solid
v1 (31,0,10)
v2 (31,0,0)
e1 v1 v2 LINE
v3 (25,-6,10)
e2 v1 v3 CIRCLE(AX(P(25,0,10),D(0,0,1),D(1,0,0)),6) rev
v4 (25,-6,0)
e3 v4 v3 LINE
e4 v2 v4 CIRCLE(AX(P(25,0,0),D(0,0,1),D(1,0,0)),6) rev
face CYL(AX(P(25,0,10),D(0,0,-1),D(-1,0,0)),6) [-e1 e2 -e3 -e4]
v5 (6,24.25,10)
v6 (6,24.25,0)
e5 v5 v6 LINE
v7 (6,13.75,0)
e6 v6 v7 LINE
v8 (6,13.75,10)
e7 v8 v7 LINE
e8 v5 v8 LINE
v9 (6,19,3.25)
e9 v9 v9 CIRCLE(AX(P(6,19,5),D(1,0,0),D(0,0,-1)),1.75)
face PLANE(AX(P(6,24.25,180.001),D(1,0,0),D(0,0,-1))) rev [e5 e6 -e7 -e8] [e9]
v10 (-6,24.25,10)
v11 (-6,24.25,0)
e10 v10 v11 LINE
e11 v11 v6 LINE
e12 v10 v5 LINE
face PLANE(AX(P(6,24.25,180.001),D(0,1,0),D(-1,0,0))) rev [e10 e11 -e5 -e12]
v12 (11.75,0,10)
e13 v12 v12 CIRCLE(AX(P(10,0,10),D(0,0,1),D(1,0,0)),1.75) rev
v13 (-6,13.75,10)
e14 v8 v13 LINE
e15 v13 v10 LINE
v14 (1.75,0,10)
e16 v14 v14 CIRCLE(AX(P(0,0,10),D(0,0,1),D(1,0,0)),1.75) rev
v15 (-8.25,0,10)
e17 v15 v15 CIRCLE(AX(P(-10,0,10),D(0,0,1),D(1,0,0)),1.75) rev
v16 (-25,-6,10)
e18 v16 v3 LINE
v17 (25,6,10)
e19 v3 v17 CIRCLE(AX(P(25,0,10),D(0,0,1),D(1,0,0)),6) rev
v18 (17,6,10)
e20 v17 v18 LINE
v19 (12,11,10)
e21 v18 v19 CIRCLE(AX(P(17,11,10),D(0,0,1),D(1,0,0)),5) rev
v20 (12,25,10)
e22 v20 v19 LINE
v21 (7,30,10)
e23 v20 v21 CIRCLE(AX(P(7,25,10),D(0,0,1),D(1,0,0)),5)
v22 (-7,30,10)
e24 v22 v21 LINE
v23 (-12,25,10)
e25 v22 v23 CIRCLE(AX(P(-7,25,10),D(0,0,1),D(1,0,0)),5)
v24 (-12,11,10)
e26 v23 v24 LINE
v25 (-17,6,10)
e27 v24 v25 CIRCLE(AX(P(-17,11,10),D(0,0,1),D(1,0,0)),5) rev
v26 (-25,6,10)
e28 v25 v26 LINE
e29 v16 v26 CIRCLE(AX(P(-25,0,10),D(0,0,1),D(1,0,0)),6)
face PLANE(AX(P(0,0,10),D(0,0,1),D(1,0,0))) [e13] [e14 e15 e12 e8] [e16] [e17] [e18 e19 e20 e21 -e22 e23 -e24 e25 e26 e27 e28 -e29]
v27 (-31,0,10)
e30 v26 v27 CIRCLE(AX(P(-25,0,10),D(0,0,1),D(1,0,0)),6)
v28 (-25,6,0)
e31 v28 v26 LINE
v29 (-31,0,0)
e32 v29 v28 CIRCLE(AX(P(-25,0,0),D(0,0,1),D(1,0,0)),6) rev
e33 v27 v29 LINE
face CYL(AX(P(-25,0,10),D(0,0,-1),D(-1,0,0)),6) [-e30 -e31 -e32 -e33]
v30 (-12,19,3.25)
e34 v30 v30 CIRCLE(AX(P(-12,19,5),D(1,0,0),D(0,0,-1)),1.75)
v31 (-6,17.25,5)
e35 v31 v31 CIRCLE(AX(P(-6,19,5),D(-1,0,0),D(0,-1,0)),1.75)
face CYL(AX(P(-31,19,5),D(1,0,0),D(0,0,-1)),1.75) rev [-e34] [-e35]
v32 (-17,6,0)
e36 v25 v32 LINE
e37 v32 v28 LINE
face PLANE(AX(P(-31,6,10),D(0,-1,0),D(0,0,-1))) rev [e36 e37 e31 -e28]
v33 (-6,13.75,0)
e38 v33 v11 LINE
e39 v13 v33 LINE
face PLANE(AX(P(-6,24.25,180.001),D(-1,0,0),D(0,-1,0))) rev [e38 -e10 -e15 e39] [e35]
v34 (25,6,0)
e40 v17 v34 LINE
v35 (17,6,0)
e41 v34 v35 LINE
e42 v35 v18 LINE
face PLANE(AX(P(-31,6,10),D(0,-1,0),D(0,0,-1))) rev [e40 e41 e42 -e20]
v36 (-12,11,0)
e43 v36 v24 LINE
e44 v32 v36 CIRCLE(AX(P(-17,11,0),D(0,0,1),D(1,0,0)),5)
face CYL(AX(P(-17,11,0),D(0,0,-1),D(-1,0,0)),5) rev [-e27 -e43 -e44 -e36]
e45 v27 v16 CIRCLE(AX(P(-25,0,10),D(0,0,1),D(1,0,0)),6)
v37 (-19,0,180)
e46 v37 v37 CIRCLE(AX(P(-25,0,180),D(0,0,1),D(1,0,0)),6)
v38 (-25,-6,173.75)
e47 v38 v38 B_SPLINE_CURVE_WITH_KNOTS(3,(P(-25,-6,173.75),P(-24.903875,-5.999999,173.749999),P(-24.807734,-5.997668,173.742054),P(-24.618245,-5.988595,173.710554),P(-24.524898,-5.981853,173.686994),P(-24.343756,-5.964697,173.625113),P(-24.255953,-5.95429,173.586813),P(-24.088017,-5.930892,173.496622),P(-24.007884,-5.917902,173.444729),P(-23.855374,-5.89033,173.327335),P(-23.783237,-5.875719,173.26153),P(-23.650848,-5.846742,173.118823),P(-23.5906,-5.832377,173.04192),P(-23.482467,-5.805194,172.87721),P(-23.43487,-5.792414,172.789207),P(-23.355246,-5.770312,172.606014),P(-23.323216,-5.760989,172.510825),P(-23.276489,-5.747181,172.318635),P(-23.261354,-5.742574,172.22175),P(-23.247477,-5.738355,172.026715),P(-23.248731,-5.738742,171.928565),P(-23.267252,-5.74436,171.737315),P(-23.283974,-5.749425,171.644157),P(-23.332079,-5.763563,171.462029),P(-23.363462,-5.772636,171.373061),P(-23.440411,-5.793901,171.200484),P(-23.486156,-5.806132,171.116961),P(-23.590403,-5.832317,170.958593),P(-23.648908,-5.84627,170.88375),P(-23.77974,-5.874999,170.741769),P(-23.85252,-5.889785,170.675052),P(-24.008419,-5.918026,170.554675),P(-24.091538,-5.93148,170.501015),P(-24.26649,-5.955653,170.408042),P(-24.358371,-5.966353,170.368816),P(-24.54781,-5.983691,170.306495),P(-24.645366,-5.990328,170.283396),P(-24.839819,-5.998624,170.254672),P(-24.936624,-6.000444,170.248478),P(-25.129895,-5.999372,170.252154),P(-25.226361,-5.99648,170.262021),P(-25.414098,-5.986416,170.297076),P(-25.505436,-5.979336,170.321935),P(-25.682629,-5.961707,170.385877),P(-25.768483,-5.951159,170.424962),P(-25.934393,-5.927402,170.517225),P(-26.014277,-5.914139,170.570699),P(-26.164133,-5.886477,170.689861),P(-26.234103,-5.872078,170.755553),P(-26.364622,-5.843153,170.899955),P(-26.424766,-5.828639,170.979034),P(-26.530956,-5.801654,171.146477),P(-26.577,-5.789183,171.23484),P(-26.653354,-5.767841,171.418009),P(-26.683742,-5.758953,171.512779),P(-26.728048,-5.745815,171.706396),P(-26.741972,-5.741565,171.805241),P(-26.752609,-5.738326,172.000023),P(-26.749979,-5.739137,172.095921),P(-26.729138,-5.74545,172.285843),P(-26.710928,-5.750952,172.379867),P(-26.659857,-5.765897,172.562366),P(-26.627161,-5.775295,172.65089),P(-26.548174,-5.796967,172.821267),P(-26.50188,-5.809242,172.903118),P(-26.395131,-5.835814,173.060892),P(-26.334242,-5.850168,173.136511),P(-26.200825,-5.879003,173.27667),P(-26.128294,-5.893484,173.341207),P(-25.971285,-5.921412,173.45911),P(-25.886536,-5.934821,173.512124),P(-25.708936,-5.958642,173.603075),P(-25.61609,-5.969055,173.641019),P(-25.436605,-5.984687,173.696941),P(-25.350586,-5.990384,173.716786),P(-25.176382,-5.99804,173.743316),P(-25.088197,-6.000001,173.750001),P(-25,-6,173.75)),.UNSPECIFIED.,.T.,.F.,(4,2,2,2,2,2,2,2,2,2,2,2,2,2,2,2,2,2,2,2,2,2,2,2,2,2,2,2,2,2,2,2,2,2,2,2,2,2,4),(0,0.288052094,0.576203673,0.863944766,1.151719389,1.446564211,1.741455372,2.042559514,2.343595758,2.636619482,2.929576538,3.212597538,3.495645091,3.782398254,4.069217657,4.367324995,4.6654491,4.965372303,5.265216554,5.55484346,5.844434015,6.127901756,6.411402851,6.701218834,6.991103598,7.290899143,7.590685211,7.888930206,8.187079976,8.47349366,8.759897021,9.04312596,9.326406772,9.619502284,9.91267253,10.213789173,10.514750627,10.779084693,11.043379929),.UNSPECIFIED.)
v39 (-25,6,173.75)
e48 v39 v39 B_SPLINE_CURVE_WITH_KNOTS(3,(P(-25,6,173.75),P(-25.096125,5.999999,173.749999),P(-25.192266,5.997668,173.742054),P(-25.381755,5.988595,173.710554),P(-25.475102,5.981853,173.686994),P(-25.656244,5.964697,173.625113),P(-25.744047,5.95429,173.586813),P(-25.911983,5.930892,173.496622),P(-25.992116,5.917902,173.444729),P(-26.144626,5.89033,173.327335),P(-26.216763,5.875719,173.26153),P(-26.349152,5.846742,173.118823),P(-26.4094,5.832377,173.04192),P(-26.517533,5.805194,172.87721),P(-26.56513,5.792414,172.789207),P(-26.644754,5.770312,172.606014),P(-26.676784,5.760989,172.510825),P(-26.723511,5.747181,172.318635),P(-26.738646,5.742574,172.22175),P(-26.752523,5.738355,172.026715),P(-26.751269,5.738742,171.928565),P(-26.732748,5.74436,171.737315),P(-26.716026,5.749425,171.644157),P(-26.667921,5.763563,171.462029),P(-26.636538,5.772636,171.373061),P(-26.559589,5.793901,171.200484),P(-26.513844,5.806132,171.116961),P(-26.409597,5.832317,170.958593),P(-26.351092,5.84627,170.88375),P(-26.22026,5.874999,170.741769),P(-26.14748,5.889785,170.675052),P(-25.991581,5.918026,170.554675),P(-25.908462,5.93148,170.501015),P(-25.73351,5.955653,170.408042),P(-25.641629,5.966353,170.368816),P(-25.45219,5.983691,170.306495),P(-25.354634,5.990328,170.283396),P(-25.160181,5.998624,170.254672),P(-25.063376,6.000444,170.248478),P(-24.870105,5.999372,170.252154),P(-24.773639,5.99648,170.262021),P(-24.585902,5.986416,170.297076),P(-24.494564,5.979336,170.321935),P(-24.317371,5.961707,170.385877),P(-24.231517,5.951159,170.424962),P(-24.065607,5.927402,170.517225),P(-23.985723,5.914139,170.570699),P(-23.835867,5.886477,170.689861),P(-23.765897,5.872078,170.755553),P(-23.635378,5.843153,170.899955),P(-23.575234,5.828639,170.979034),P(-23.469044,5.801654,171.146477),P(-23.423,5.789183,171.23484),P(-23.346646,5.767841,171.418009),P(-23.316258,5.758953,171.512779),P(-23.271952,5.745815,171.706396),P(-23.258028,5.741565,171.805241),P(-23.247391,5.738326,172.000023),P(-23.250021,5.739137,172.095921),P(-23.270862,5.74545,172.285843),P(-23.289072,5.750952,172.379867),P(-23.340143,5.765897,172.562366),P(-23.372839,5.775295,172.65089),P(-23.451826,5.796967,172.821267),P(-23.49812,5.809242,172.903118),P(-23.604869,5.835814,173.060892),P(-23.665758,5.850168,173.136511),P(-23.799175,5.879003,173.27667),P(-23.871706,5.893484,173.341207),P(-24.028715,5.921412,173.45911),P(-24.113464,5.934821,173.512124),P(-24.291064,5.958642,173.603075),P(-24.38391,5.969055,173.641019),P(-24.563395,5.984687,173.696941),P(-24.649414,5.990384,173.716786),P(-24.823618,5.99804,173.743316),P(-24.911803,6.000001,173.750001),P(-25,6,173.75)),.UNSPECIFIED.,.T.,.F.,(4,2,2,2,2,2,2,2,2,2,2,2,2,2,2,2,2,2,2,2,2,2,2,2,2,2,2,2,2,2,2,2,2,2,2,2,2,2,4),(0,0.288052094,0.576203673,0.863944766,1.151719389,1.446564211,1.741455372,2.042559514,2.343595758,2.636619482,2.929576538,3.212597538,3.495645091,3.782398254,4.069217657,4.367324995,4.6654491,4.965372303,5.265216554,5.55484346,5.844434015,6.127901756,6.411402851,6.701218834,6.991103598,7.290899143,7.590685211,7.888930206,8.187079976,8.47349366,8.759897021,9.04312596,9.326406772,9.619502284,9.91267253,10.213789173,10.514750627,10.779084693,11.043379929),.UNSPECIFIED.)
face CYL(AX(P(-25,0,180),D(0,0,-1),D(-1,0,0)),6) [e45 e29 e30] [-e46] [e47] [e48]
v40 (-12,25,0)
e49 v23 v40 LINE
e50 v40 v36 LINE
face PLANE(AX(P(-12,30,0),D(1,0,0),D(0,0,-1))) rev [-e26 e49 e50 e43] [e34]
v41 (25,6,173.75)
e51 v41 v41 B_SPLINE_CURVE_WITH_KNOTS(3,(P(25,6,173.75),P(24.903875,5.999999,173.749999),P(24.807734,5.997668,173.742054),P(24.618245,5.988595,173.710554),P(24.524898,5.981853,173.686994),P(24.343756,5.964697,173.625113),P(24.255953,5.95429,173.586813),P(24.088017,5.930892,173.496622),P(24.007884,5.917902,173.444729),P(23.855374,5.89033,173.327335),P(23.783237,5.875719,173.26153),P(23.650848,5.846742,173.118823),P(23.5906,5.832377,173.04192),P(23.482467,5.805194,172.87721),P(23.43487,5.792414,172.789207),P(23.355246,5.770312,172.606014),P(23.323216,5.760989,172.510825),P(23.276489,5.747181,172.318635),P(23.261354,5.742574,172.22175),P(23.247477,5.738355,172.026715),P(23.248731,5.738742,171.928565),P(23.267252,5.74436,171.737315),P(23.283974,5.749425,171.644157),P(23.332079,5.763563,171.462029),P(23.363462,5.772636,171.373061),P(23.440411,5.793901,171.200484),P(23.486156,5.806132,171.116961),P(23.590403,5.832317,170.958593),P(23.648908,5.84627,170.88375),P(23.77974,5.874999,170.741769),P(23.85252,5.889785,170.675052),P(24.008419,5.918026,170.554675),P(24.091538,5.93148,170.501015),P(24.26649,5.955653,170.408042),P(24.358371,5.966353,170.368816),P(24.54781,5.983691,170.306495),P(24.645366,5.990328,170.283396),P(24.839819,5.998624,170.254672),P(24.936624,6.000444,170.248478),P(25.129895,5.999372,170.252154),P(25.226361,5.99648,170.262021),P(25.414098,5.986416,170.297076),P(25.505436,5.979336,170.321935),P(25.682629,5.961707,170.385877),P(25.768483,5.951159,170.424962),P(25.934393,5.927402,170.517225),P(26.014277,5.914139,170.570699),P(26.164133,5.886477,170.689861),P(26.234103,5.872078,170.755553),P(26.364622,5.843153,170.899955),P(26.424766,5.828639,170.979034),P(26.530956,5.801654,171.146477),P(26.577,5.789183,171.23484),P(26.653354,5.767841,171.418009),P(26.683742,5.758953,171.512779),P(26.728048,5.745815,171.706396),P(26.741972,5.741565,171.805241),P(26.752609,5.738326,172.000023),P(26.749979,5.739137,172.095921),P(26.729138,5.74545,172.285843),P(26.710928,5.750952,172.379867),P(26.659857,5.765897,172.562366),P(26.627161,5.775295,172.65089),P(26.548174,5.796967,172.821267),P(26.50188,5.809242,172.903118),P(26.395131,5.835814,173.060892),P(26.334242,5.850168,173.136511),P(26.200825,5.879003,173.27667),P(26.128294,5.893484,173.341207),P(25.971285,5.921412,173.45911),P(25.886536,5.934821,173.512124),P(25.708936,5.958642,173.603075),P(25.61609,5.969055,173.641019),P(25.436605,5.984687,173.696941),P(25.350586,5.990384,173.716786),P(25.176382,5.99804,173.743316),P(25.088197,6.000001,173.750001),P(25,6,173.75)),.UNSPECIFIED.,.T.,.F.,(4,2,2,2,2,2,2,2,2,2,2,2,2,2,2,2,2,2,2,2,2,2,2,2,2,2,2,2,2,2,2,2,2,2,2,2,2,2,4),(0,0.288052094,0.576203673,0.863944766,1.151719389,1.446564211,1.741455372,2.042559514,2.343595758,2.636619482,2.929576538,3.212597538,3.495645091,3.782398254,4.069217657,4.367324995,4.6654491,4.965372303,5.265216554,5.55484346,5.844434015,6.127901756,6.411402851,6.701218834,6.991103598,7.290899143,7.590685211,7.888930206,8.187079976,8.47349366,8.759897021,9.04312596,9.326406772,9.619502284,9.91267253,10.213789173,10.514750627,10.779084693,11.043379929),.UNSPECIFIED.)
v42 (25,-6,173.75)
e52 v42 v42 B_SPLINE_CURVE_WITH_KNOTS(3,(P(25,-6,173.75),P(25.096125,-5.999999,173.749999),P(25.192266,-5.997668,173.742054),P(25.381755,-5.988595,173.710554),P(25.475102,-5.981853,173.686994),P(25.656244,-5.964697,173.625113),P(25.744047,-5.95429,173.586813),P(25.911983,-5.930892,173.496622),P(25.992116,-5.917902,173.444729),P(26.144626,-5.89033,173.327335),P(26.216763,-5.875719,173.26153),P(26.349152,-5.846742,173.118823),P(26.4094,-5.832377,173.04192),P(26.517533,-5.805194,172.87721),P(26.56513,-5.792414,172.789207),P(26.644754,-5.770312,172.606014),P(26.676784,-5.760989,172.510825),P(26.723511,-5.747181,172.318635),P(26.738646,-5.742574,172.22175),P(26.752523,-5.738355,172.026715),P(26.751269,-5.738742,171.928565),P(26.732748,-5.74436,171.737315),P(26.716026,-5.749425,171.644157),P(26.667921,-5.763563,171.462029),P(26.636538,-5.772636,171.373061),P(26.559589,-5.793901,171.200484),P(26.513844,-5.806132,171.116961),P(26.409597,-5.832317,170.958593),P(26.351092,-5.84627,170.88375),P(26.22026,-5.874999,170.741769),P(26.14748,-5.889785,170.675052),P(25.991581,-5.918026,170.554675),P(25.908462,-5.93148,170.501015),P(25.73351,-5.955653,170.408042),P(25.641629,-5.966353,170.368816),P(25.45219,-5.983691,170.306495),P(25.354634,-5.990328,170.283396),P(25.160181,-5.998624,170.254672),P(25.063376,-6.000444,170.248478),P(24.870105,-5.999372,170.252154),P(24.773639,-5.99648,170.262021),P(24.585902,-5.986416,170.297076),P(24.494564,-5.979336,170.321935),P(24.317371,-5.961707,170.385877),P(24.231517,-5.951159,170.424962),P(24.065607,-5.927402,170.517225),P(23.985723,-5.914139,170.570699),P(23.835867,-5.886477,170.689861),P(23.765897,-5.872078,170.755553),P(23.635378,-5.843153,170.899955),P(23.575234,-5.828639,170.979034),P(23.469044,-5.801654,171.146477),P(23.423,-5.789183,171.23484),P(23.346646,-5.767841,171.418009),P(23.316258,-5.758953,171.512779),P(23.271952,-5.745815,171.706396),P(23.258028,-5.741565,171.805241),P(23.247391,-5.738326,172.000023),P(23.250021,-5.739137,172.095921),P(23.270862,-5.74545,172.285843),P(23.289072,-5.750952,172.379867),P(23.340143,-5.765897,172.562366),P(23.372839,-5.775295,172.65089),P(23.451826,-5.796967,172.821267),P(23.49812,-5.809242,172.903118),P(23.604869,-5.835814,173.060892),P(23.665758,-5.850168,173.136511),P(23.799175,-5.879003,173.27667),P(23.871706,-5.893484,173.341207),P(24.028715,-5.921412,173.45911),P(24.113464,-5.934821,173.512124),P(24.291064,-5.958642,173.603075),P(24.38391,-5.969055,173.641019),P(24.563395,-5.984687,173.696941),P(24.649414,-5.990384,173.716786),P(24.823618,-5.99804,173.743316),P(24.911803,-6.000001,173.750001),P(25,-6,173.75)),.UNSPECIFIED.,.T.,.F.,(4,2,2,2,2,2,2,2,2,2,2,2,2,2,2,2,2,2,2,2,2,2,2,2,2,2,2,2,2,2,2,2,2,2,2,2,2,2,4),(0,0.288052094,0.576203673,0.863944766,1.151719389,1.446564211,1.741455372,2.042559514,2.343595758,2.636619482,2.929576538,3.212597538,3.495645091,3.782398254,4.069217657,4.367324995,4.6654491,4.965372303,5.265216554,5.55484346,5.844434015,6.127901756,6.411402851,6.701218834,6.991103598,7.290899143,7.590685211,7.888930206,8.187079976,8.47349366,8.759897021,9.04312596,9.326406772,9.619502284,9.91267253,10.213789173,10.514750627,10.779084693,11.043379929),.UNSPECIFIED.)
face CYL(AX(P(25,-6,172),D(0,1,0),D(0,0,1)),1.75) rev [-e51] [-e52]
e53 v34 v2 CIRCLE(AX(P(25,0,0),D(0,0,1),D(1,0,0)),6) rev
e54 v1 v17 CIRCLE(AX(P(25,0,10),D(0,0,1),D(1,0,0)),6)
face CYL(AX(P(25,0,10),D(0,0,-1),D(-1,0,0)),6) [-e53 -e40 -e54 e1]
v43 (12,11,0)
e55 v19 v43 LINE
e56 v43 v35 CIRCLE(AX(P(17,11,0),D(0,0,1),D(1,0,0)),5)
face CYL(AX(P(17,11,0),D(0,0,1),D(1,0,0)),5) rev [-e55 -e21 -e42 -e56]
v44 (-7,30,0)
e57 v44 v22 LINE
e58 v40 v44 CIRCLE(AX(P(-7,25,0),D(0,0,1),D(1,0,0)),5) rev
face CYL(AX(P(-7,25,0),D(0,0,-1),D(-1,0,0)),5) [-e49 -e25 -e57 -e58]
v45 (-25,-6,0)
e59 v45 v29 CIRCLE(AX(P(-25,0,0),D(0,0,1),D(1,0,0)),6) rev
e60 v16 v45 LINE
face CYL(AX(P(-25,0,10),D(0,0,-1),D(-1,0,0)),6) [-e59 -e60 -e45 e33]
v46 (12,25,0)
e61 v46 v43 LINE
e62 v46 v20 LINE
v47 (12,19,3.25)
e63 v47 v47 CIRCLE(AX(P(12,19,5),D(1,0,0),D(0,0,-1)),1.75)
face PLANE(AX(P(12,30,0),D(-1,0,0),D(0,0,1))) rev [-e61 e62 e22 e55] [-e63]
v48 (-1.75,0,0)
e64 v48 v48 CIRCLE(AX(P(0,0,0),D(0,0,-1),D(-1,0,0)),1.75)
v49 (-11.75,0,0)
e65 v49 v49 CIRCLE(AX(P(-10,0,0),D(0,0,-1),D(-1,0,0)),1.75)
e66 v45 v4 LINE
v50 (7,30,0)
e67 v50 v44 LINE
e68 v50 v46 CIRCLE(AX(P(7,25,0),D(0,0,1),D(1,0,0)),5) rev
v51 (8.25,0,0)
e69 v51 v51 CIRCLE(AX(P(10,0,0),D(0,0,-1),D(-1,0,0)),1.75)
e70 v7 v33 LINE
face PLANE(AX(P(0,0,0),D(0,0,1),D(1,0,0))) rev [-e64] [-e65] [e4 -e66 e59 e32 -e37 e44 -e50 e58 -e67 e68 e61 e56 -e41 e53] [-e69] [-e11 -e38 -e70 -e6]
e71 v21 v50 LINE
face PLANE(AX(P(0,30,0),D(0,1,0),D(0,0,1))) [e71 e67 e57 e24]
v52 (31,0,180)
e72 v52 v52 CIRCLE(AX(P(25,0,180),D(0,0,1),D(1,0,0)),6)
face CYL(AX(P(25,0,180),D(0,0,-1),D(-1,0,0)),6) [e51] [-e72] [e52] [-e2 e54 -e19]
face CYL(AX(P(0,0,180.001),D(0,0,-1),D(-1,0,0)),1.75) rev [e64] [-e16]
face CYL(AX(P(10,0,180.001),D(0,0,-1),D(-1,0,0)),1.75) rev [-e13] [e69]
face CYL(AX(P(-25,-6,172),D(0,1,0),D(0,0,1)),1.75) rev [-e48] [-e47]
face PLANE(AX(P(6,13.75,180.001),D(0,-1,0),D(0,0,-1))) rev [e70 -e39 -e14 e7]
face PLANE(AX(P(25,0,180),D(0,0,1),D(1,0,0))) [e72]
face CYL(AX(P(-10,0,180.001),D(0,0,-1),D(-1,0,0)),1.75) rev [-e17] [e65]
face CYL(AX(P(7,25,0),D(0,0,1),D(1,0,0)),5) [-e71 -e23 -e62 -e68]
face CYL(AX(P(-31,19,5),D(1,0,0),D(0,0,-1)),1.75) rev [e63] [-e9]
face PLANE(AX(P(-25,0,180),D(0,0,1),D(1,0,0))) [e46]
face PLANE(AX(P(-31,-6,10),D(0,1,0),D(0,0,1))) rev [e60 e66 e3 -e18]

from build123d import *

# Parameters (mm, degrees)
SKETCH1_W               = 62
SKETCH1_H               = 12
BOSS_EXTRUDE1_DEPTH     = 10
SKETCH2_R               = 6
BOSS_EXTRUDE2_DEPTH     = 170
SKETCH3_W               = 24
SKETCH3_H               = 10
BOSS_EXTRUDE3_DEPTH     = 24
CUT_EXTRUDE1_REACH      = 187.097
SKETCH4_W               = 12
SKETCH4_H               = 10.5
SKETCH5_R               = 1.75
CUT_EXTRUDE2_DEPTH      = 188.48066567
FILLET1_R               = 6
FILLET2_R               = 5
CUT_EXTRUDE3_DEPTH      = 186.097271725
CUT_EXTRUDE3_DEPTH_BACK = 186.097271725
SKETCH6_R               = 1.75
CUT_EXTRUDE4_REACH      = 187.097
SKETCH7_R               = 1.75
CUT_EXTRUDE5_REACH      = 187.097
SKETCH8_R               = 1.75


with BuildPart() as part:
    # Sketch1 → Boss-Extrude1 (new body)
    with BuildSketch(Plane.XY):
        Rectangle(SKETCH1_W, SKETCH1_H)
    extrude(amount=BOSS_EXTRUDE1_DEPTH)

    # Sketch2 → Boss-Extrude2 (add)
    with BuildSketch(Plane.XY.offset(10)):
        with Locations(Location((-25, 0, 0), (0, 0, 180))):
            Circle(SKETCH2_R)
        with Locations((25, 0)):
            Circle(SKETCH2_R)
    extrude(amount=BOSS_EXTRUDE2_DEPTH)

    # Sketch3 → Boss-Extrude3 (add)
    with BuildSketch(Plane(origin=(0, 6, 0), x_dir=(1, 0, 0), z_dir=(0, 1, 0))):
        with Locations((0, -5)):
            Rectangle(SKETCH3_W, SKETCH3_H)
    extrude(amount=BOSS_EXTRUDE3_DEPTH)

    # Sketch4 → Cut-Extrude1 (cut, up to next)
    with BuildSketch(Plane(origin=(0, 0, 0), x_dir=(-1, 0, 0), z_dir=(0, 0, -1)), mode=Mode.PRIVATE) as cut_extrude1_sk1:
        with Locations((0, 19)):
            Rectangle(SKETCH4_W, SKETCH4_H)
    cut_extrude1_tool1 = extrude(cut_extrude1_sk1.sketch, amount=-CUT_EXTRUDE1_REACH, mode=Mode.PRIVATE) & part.part
    add(cut_extrude1_tool1.solids().sort_by_distance((0, 19, 0))[0], mode=Mode.SUBTRACT)

    # Sketch5 → Cut-Extrude2 (cut, through all)
    with BuildSketch(Plane(origin=(12, 0, 0), x_dir=(0, 0, -1), z_dir=(1, 0, 0))):
        with Locations((-5, 19)):
            Circle(SKETCH5_R)
    extrude(amount=-CUT_EXTRUDE2_DEPTH, mode=Mode.SUBTRACT)

    # Fillet1
    fillet1_edges = [part.edges().sort_by_distance(p)[0] for p in [
        (-31, -6, 5),
        (-31, 6, 5),
        (31, 6, 5),
        (31, -6, 5),
    ]]
    fillet(fillet1_edges, radius=FILLET1_R - 0.0001)  # a hair under: the kernel refuses the full size

    # Fillet2
    fillet2_edges = [part.edges().sort_by_distance(p)[0] for p in [
        (-12, 6, 5),
        (12, 6, 5),
        (-12, 30, 5),
        (12, 30, 5),
    ]]
    fillet(fillet2_edges, radius=FILLET2_R)

    # Sketch6 → Cut-Extrude3 (cut, two sides: drawn at the far end of the back side and taken through both)
    with BuildSketch(Plane(origin=(0, 0, 0), x_dir=(1, 0, 0), z_dir=(0, 1, 0)).offset(-CUT_EXTRUDE3_DEPTH_BACK)):
        with Locations(Location((-25, -172, 0), (0, 0, 270))):
            Circle(SKETCH6_R)
        with Locations(Location((25, -172, 0), (0, 0, 270))):
            Circle(SKETCH6_R)
    extrude(amount=CUT_EXTRUDE3_DEPTH + CUT_EXTRUDE3_DEPTH_BACK, mode=Mode.SUBTRACT)

    # Sketch7 → Cut-Extrude4 (cut, up to next)
    with BuildSketch(Plane(origin=(0, 0, 0), x_dir=(-1, 0, 0), z_dir=(0, 0, -1)), mode=Mode.PRIVATE) as cut_extrude4_sk1:
        with Locations((-10, 0)):
            Circle(SKETCH7_R)
    cut_extrude4_tool1 = extrude(cut_extrude4_sk1.sketch, amount=-CUT_EXTRUDE4_REACH, mode=Mode.PRIVATE) & part.part
    # Sketch7 → Cut-Extrude4 (cut, up to next)
    with BuildSketch(Plane(origin=(0, 0, 0), x_dir=(-1, 0, 0), z_dir=(0, 0, -1)), mode=Mode.PRIVATE) as cut_extrude4_sk2:
        with Locations((10, 0)):
            Circle(SKETCH7_R)
    cut_extrude4_tool2 = extrude(cut_extrude4_sk2.sketch, amount=-CUT_EXTRUDE4_REACH, mode=Mode.PRIVATE) & part.part
    add(cut_extrude4_tool1.solids().sort_by_distance((10, 0, 0))[0], mode=Mode.SUBTRACT)
    add(cut_extrude4_tool2.solids().sort_by_distance((-10, 0, 0))[0], mode=Mode.SUBTRACT)

    # Sketch8 → Cut-Extrude5 (cut, up to next)
    with BuildSketch(Plane(origin=(0, 0, 0), x_dir=(-1, 0, 0), z_dir=(0, 0, -1)), mode=Mode.PRIVATE) as cut_extrude5_sk1:
        Circle(SKETCH8_R)
    cut_extrude5_tool1 = extrude(cut_extrude5_sk1.sketch, amount=-CUT_EXTRUDE5_REACH, mode=Mode.PRIVATE) & part.part
    add(cut_extrude5_tool1.solids().sort_by_distance((0, 0, 0))[0], mode=Mode.SUBTRACT)


solid = part.part
